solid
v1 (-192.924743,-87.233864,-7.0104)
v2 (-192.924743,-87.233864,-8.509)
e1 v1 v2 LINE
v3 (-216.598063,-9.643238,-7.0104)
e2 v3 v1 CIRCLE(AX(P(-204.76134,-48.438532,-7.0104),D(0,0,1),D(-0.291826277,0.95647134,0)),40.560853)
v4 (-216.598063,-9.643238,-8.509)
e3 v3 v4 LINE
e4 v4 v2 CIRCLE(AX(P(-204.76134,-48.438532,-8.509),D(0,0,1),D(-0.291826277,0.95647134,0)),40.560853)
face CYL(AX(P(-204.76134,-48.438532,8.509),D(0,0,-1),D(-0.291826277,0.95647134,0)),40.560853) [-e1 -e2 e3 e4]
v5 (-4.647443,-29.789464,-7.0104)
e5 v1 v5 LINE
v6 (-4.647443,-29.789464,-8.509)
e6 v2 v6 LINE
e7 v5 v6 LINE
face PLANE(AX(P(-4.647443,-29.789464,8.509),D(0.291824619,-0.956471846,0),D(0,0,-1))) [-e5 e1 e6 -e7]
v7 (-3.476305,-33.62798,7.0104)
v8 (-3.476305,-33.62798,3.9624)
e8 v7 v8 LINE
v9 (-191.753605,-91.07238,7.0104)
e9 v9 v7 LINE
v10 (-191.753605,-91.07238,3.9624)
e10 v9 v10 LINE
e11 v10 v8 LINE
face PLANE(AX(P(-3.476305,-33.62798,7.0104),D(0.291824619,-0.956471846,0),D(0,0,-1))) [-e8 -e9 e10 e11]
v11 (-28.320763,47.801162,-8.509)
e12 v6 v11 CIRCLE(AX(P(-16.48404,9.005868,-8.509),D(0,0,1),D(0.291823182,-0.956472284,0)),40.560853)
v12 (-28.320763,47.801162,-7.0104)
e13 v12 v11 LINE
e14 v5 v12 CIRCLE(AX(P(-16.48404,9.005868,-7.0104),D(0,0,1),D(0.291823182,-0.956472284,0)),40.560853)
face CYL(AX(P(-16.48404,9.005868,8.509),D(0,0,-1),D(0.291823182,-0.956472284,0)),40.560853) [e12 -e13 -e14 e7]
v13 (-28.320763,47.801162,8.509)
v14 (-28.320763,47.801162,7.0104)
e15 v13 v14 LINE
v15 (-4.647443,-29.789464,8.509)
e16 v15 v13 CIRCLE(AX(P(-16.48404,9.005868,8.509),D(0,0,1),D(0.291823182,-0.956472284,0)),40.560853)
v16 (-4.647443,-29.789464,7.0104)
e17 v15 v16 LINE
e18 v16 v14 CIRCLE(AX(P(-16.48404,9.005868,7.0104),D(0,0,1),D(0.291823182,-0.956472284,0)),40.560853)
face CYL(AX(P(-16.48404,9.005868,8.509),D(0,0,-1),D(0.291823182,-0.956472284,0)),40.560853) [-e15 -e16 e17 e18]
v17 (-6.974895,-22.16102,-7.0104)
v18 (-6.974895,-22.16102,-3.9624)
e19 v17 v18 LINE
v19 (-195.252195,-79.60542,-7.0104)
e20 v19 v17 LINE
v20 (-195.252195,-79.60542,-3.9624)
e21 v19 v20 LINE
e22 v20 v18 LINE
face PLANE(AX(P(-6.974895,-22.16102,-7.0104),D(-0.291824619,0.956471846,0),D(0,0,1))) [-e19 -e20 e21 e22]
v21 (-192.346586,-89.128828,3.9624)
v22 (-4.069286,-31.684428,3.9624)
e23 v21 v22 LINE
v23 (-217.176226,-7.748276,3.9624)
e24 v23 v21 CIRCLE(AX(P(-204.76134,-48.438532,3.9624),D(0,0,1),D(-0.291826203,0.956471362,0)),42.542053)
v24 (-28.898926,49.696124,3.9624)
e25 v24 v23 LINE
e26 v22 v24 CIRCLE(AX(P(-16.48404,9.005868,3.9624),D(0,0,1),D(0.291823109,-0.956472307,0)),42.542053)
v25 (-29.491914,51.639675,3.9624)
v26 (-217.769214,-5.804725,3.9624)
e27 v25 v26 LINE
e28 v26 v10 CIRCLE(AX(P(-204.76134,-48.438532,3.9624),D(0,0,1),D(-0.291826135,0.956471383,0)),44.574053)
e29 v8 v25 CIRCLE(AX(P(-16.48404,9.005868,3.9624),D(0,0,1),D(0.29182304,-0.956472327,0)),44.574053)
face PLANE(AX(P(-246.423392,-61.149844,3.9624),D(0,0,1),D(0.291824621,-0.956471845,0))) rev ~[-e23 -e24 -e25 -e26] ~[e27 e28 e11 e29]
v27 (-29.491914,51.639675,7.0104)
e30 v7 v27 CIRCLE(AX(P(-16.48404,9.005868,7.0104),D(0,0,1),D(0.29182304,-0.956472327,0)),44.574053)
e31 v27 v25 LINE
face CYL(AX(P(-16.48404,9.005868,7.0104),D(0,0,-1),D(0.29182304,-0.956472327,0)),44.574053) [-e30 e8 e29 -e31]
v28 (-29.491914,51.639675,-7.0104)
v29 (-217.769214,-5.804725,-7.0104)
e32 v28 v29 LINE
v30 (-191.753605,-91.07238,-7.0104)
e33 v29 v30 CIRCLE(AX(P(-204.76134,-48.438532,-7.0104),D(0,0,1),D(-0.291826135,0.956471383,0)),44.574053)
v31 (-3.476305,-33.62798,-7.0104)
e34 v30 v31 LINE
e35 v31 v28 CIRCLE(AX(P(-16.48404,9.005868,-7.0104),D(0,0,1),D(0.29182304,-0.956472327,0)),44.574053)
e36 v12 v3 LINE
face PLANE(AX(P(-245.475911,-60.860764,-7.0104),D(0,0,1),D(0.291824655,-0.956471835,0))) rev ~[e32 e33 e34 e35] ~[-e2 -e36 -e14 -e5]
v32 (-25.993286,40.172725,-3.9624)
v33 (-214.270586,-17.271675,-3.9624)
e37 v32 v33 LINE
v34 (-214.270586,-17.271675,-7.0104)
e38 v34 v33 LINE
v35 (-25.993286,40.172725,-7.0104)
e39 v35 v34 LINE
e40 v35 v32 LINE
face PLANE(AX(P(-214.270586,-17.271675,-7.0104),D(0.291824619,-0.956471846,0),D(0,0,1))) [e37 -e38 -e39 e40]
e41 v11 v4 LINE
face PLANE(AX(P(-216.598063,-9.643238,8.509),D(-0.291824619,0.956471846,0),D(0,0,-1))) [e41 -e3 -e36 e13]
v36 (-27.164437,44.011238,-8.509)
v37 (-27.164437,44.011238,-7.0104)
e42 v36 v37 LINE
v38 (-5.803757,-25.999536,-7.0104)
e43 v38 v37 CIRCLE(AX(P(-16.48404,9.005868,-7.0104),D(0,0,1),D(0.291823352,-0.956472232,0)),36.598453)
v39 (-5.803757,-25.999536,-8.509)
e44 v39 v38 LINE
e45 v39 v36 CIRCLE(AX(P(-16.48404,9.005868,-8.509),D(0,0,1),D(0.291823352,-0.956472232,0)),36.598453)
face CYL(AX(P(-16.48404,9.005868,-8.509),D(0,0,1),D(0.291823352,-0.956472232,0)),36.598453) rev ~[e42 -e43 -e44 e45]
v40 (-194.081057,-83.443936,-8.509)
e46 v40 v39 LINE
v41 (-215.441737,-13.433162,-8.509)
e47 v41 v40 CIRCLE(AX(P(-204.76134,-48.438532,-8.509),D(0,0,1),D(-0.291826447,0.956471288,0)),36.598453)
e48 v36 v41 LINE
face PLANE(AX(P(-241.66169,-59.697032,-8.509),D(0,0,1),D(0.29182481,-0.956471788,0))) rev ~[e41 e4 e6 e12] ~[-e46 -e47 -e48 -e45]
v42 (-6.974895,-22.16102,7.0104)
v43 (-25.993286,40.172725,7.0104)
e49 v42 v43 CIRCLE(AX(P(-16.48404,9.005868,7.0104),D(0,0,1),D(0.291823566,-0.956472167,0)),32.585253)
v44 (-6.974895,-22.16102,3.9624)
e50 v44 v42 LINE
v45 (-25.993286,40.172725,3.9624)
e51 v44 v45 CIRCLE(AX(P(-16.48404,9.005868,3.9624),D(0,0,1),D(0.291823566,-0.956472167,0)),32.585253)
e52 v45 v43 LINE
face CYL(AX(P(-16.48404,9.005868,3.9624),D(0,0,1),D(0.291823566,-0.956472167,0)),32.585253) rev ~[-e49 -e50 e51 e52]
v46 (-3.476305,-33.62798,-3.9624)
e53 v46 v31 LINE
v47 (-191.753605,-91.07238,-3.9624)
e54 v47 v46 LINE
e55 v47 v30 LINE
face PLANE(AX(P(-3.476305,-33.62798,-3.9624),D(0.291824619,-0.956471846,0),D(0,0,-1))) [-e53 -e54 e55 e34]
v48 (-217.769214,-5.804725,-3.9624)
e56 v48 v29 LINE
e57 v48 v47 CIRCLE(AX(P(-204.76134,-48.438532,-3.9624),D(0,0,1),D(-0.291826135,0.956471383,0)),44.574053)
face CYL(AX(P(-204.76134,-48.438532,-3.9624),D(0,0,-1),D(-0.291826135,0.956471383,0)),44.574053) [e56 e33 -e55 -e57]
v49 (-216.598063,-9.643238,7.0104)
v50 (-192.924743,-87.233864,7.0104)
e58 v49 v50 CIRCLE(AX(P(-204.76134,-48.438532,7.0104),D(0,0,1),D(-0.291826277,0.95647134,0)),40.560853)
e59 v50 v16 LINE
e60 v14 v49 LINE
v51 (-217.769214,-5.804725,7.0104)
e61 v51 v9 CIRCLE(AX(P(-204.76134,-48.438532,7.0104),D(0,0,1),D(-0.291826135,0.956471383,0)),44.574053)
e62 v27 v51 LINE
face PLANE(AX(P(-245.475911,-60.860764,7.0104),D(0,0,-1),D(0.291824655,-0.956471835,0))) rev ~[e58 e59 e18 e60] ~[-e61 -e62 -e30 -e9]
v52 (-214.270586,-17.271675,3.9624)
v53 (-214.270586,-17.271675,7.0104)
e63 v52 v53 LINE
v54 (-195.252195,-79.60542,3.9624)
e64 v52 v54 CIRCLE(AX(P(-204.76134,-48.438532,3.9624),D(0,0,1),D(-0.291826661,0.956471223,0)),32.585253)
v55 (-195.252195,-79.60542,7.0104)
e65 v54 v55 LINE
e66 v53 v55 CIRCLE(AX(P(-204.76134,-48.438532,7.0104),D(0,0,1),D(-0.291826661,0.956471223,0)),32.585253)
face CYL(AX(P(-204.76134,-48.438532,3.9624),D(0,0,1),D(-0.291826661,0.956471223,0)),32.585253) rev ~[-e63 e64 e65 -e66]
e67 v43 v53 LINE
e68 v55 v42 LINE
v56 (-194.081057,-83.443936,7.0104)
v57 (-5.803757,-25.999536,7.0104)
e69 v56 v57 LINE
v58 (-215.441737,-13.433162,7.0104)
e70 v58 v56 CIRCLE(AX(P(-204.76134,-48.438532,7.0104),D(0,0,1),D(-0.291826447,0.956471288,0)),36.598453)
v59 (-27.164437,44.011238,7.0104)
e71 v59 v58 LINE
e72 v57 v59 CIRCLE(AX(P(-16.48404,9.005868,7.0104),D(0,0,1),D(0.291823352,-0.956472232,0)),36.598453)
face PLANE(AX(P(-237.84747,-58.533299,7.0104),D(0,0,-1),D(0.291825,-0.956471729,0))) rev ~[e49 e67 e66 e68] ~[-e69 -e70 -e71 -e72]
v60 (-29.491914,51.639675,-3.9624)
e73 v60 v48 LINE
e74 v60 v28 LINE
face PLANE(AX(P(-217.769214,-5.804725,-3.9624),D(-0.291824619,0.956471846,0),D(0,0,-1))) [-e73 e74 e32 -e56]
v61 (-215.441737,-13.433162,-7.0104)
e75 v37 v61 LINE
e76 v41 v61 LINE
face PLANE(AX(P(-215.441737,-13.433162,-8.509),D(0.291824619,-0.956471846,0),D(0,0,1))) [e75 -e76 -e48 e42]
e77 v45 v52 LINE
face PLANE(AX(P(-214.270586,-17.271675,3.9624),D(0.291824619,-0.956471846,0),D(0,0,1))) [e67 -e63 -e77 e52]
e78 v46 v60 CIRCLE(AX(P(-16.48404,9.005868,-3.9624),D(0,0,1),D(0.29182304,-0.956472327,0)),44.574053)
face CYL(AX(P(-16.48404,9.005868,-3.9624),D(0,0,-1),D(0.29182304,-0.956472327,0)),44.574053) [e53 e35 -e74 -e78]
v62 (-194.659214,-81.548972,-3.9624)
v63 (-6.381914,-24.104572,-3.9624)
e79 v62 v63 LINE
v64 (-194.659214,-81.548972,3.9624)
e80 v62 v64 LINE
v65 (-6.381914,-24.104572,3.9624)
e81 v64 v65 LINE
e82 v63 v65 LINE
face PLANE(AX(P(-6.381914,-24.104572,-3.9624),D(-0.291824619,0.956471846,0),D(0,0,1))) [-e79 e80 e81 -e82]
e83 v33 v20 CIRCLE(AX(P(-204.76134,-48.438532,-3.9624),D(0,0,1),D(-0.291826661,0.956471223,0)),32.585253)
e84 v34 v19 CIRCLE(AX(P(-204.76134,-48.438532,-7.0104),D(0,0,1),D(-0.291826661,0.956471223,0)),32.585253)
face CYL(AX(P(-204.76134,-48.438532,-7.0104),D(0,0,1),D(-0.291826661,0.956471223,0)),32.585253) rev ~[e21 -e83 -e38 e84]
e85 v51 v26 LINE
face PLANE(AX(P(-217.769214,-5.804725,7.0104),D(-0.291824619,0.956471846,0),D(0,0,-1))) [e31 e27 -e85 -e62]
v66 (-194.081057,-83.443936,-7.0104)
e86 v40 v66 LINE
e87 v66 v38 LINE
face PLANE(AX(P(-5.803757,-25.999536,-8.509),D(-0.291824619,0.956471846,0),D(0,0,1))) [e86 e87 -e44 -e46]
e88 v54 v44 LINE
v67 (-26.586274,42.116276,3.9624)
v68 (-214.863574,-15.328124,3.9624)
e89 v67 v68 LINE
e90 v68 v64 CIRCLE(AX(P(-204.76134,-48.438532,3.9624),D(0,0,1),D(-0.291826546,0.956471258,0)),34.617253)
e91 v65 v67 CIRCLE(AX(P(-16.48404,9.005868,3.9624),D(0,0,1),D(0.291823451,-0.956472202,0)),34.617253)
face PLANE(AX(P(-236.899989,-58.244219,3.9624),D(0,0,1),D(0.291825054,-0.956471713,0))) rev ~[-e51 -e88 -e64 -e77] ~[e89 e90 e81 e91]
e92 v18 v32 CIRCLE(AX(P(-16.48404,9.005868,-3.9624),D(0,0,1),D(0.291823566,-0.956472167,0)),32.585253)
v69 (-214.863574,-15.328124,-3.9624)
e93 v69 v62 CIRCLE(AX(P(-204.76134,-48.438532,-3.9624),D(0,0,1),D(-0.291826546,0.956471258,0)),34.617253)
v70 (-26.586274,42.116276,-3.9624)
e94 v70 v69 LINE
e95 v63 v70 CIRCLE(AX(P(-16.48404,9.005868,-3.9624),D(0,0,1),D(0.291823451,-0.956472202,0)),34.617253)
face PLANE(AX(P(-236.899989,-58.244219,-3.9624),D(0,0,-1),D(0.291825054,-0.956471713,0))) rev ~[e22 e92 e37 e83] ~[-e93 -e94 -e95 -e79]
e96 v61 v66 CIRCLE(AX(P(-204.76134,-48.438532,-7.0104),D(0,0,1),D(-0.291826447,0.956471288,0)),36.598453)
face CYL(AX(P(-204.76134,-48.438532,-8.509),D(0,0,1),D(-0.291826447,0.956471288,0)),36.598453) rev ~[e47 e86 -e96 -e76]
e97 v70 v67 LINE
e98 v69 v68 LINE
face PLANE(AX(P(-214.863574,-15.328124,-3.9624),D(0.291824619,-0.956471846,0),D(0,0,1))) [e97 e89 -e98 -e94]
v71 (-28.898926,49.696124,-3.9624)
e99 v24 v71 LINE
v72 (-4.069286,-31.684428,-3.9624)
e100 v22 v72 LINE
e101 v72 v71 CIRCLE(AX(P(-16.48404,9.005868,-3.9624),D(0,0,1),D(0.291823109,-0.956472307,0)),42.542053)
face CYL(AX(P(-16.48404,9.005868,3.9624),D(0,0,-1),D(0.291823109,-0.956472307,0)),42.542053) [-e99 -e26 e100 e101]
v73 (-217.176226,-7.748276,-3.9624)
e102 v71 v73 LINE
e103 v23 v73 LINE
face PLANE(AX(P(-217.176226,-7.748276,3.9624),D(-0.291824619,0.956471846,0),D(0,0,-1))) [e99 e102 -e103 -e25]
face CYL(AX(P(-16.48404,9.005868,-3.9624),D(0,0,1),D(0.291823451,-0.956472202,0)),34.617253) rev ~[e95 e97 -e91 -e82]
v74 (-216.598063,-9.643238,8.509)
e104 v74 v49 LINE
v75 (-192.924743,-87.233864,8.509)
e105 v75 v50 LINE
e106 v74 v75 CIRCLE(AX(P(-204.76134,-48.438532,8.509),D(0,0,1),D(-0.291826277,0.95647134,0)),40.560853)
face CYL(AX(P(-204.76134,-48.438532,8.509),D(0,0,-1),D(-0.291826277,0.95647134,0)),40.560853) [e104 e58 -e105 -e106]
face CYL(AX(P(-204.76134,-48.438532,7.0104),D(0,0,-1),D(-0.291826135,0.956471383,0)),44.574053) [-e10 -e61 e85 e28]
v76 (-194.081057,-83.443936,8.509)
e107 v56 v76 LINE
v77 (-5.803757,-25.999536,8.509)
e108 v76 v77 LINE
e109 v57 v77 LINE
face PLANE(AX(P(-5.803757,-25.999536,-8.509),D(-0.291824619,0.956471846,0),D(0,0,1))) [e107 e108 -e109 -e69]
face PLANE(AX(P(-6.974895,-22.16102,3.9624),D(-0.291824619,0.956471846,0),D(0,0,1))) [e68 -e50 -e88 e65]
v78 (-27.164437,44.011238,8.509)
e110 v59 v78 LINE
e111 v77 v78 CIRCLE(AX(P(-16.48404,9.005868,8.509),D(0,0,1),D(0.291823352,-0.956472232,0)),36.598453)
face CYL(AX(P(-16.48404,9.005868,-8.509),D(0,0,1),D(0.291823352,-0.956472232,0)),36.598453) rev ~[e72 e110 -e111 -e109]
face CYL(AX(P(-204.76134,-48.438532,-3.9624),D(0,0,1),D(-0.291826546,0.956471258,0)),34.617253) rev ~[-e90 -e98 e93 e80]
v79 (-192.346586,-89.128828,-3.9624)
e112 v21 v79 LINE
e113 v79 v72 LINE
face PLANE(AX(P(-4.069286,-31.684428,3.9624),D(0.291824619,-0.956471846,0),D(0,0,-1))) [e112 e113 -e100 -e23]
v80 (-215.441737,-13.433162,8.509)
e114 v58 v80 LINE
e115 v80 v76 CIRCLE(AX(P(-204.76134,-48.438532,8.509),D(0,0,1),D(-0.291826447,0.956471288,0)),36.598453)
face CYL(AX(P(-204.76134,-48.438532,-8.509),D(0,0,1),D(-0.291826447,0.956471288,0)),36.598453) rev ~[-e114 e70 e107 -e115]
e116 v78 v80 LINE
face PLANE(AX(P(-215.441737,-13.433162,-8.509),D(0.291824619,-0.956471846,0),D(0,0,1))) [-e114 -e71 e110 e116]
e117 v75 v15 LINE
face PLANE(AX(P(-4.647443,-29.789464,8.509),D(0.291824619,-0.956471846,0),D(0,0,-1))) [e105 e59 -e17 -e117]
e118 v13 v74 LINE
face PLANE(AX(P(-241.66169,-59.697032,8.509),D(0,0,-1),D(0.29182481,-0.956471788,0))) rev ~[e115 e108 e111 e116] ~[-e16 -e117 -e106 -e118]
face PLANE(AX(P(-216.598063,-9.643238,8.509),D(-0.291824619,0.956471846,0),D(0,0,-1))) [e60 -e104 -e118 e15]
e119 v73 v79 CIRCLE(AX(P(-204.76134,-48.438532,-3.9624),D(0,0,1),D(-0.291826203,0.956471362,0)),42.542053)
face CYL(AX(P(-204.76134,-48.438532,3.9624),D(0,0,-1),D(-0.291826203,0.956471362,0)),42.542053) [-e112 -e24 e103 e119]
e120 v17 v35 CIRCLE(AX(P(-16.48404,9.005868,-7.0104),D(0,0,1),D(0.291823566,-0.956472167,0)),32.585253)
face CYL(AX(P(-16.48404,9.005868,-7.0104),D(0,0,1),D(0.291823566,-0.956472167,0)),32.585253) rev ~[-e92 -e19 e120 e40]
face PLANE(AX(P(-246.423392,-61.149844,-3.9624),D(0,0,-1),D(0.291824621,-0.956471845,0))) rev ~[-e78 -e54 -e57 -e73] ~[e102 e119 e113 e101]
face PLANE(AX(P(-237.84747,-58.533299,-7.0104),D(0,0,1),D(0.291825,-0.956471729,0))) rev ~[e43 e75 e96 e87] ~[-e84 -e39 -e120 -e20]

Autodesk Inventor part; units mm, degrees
ref_plane "Work Plane2" through (-16.4841, 9.0059, 0) normal (-1, 0, 0) x (0, 0, 1)
ref_plane "Work Plane3" through (-204.7614, -48.4385, 0) normal (1, 0, 0) x (0, 0, 1)
sketch "Path" plane through (0, 0, 0) normal (0, 0, 1) x (1, 0, 0)
  arc A0 (-5.2256, -27.8945) -> (-27.7426, 45.9062) centre (-16.4841, 9.0059) ccw
  arc A1 (-216.0199, -11.5382) -> (-193.5029, -85.3389) centre (-204.7614, -48.4385) ccw
  line L0 (-216.0199, -11.5382) -> (-27.7426, 45.9062)
  line L1 (-5.2256, -27.8945) -> (-193.5029, -85.3389)
  dimension "d31" = 11.9888
ref_plane "Section Plane" through (-27.7426, 45.9062, 0) normal (-0.9564718, -0.2918247, 0) x (0, 0, 1)
sketch "Section Sketch" plane through (-27.7426, 45.9062, 0) normal (-0.9564718, -0.2918247, 0) x (0, 0, 1)
  line L0 (-8.509, -1.9812) -> (8.509, -1.9812)
  line L1 (8.509, -1.9812) -> (8.509, 1.9812)
  line L2 (8.509, 1.9812) -> (-8.509, 1.9812)
  line L3 (-8.509, 1.9812) -> (-8.509, -1.9812)
  line L4 (-3.9624, -3.9624) -> (3.9624, -3.9624)
  line L5 (3.9624, -3.9624) -> (3.9624, 3.9624)
  line L6 (3.9624, 3.9624) -> (-3.9624, 3.9624)
  line L7 (-3.9624, 3.9624) -> (-3.9624, -3.9624)
  line L8 (-3.9624, 0) -> (3.9624, 0) construction
  line L9 (-7.0104, -5.9944) -> (-3.9624, -5.9944)
  line L10 (-3.9624, -5.9944) -> (-3.9624, 5.9944)
  line L11 (-3.9624, 5.9944) -> (-7.0104, 5.9944)
  line L12 (-7.0104, 5.9944) -> (-7.0104, -5.9944)
  line L13 (3.9624, -5.9944) -> (7.0104, -5.9944)
  line L14 (7.0104, -5.9944) -> (7.0104, 5.9944)
  line L15 (7.0104, 5.9944) -> (3.9624, 5.9944)
  line L16 (3.9624, 5.9944) -> (3.9624, -5.9944)
  line L17 (-8.509, 0) -> (8.509, 0) construction
  point P0 (0, 0)
  point P1 (0, 0)
  dimension "d21" = 3.9624
  dimension "d22" = 7.9248
  dimension "d23" = 7.9248
  dimension "d24" = 3.048
  dimension "d31" = 11.9888
  dimension "d32" = 17.018
sweep "Solid" add profiles "Section Sketch" path "Path"
pattern_of_one "Strand Pattern"
equation "\"d21\" = da_d2"
equation "\"d22\" = da_d1"
equation "\"d23\" = da_b1"
equation "\"d24\" = da_t1 + da_t2"
equation "\"d30\" = da_pt"
equation "\"da_p\" = 12.7"
equation "\"da_b1\" = 7.9248"
equation "\"da_h2\" = 11.9888"
equation "\"da_h3\" = 10.3886"
equation "\"da_d1\" = 7.9248"
equation "\"da_d2\" = 3.9624"
equation "\"da_pt\" = 14.3764"
equation "\"da_b\" = 17.018"
equation "\"da_t1\" = 1.524"
equation "\"da_t2\" = 1.524"
properties part number "Roller Chain"
